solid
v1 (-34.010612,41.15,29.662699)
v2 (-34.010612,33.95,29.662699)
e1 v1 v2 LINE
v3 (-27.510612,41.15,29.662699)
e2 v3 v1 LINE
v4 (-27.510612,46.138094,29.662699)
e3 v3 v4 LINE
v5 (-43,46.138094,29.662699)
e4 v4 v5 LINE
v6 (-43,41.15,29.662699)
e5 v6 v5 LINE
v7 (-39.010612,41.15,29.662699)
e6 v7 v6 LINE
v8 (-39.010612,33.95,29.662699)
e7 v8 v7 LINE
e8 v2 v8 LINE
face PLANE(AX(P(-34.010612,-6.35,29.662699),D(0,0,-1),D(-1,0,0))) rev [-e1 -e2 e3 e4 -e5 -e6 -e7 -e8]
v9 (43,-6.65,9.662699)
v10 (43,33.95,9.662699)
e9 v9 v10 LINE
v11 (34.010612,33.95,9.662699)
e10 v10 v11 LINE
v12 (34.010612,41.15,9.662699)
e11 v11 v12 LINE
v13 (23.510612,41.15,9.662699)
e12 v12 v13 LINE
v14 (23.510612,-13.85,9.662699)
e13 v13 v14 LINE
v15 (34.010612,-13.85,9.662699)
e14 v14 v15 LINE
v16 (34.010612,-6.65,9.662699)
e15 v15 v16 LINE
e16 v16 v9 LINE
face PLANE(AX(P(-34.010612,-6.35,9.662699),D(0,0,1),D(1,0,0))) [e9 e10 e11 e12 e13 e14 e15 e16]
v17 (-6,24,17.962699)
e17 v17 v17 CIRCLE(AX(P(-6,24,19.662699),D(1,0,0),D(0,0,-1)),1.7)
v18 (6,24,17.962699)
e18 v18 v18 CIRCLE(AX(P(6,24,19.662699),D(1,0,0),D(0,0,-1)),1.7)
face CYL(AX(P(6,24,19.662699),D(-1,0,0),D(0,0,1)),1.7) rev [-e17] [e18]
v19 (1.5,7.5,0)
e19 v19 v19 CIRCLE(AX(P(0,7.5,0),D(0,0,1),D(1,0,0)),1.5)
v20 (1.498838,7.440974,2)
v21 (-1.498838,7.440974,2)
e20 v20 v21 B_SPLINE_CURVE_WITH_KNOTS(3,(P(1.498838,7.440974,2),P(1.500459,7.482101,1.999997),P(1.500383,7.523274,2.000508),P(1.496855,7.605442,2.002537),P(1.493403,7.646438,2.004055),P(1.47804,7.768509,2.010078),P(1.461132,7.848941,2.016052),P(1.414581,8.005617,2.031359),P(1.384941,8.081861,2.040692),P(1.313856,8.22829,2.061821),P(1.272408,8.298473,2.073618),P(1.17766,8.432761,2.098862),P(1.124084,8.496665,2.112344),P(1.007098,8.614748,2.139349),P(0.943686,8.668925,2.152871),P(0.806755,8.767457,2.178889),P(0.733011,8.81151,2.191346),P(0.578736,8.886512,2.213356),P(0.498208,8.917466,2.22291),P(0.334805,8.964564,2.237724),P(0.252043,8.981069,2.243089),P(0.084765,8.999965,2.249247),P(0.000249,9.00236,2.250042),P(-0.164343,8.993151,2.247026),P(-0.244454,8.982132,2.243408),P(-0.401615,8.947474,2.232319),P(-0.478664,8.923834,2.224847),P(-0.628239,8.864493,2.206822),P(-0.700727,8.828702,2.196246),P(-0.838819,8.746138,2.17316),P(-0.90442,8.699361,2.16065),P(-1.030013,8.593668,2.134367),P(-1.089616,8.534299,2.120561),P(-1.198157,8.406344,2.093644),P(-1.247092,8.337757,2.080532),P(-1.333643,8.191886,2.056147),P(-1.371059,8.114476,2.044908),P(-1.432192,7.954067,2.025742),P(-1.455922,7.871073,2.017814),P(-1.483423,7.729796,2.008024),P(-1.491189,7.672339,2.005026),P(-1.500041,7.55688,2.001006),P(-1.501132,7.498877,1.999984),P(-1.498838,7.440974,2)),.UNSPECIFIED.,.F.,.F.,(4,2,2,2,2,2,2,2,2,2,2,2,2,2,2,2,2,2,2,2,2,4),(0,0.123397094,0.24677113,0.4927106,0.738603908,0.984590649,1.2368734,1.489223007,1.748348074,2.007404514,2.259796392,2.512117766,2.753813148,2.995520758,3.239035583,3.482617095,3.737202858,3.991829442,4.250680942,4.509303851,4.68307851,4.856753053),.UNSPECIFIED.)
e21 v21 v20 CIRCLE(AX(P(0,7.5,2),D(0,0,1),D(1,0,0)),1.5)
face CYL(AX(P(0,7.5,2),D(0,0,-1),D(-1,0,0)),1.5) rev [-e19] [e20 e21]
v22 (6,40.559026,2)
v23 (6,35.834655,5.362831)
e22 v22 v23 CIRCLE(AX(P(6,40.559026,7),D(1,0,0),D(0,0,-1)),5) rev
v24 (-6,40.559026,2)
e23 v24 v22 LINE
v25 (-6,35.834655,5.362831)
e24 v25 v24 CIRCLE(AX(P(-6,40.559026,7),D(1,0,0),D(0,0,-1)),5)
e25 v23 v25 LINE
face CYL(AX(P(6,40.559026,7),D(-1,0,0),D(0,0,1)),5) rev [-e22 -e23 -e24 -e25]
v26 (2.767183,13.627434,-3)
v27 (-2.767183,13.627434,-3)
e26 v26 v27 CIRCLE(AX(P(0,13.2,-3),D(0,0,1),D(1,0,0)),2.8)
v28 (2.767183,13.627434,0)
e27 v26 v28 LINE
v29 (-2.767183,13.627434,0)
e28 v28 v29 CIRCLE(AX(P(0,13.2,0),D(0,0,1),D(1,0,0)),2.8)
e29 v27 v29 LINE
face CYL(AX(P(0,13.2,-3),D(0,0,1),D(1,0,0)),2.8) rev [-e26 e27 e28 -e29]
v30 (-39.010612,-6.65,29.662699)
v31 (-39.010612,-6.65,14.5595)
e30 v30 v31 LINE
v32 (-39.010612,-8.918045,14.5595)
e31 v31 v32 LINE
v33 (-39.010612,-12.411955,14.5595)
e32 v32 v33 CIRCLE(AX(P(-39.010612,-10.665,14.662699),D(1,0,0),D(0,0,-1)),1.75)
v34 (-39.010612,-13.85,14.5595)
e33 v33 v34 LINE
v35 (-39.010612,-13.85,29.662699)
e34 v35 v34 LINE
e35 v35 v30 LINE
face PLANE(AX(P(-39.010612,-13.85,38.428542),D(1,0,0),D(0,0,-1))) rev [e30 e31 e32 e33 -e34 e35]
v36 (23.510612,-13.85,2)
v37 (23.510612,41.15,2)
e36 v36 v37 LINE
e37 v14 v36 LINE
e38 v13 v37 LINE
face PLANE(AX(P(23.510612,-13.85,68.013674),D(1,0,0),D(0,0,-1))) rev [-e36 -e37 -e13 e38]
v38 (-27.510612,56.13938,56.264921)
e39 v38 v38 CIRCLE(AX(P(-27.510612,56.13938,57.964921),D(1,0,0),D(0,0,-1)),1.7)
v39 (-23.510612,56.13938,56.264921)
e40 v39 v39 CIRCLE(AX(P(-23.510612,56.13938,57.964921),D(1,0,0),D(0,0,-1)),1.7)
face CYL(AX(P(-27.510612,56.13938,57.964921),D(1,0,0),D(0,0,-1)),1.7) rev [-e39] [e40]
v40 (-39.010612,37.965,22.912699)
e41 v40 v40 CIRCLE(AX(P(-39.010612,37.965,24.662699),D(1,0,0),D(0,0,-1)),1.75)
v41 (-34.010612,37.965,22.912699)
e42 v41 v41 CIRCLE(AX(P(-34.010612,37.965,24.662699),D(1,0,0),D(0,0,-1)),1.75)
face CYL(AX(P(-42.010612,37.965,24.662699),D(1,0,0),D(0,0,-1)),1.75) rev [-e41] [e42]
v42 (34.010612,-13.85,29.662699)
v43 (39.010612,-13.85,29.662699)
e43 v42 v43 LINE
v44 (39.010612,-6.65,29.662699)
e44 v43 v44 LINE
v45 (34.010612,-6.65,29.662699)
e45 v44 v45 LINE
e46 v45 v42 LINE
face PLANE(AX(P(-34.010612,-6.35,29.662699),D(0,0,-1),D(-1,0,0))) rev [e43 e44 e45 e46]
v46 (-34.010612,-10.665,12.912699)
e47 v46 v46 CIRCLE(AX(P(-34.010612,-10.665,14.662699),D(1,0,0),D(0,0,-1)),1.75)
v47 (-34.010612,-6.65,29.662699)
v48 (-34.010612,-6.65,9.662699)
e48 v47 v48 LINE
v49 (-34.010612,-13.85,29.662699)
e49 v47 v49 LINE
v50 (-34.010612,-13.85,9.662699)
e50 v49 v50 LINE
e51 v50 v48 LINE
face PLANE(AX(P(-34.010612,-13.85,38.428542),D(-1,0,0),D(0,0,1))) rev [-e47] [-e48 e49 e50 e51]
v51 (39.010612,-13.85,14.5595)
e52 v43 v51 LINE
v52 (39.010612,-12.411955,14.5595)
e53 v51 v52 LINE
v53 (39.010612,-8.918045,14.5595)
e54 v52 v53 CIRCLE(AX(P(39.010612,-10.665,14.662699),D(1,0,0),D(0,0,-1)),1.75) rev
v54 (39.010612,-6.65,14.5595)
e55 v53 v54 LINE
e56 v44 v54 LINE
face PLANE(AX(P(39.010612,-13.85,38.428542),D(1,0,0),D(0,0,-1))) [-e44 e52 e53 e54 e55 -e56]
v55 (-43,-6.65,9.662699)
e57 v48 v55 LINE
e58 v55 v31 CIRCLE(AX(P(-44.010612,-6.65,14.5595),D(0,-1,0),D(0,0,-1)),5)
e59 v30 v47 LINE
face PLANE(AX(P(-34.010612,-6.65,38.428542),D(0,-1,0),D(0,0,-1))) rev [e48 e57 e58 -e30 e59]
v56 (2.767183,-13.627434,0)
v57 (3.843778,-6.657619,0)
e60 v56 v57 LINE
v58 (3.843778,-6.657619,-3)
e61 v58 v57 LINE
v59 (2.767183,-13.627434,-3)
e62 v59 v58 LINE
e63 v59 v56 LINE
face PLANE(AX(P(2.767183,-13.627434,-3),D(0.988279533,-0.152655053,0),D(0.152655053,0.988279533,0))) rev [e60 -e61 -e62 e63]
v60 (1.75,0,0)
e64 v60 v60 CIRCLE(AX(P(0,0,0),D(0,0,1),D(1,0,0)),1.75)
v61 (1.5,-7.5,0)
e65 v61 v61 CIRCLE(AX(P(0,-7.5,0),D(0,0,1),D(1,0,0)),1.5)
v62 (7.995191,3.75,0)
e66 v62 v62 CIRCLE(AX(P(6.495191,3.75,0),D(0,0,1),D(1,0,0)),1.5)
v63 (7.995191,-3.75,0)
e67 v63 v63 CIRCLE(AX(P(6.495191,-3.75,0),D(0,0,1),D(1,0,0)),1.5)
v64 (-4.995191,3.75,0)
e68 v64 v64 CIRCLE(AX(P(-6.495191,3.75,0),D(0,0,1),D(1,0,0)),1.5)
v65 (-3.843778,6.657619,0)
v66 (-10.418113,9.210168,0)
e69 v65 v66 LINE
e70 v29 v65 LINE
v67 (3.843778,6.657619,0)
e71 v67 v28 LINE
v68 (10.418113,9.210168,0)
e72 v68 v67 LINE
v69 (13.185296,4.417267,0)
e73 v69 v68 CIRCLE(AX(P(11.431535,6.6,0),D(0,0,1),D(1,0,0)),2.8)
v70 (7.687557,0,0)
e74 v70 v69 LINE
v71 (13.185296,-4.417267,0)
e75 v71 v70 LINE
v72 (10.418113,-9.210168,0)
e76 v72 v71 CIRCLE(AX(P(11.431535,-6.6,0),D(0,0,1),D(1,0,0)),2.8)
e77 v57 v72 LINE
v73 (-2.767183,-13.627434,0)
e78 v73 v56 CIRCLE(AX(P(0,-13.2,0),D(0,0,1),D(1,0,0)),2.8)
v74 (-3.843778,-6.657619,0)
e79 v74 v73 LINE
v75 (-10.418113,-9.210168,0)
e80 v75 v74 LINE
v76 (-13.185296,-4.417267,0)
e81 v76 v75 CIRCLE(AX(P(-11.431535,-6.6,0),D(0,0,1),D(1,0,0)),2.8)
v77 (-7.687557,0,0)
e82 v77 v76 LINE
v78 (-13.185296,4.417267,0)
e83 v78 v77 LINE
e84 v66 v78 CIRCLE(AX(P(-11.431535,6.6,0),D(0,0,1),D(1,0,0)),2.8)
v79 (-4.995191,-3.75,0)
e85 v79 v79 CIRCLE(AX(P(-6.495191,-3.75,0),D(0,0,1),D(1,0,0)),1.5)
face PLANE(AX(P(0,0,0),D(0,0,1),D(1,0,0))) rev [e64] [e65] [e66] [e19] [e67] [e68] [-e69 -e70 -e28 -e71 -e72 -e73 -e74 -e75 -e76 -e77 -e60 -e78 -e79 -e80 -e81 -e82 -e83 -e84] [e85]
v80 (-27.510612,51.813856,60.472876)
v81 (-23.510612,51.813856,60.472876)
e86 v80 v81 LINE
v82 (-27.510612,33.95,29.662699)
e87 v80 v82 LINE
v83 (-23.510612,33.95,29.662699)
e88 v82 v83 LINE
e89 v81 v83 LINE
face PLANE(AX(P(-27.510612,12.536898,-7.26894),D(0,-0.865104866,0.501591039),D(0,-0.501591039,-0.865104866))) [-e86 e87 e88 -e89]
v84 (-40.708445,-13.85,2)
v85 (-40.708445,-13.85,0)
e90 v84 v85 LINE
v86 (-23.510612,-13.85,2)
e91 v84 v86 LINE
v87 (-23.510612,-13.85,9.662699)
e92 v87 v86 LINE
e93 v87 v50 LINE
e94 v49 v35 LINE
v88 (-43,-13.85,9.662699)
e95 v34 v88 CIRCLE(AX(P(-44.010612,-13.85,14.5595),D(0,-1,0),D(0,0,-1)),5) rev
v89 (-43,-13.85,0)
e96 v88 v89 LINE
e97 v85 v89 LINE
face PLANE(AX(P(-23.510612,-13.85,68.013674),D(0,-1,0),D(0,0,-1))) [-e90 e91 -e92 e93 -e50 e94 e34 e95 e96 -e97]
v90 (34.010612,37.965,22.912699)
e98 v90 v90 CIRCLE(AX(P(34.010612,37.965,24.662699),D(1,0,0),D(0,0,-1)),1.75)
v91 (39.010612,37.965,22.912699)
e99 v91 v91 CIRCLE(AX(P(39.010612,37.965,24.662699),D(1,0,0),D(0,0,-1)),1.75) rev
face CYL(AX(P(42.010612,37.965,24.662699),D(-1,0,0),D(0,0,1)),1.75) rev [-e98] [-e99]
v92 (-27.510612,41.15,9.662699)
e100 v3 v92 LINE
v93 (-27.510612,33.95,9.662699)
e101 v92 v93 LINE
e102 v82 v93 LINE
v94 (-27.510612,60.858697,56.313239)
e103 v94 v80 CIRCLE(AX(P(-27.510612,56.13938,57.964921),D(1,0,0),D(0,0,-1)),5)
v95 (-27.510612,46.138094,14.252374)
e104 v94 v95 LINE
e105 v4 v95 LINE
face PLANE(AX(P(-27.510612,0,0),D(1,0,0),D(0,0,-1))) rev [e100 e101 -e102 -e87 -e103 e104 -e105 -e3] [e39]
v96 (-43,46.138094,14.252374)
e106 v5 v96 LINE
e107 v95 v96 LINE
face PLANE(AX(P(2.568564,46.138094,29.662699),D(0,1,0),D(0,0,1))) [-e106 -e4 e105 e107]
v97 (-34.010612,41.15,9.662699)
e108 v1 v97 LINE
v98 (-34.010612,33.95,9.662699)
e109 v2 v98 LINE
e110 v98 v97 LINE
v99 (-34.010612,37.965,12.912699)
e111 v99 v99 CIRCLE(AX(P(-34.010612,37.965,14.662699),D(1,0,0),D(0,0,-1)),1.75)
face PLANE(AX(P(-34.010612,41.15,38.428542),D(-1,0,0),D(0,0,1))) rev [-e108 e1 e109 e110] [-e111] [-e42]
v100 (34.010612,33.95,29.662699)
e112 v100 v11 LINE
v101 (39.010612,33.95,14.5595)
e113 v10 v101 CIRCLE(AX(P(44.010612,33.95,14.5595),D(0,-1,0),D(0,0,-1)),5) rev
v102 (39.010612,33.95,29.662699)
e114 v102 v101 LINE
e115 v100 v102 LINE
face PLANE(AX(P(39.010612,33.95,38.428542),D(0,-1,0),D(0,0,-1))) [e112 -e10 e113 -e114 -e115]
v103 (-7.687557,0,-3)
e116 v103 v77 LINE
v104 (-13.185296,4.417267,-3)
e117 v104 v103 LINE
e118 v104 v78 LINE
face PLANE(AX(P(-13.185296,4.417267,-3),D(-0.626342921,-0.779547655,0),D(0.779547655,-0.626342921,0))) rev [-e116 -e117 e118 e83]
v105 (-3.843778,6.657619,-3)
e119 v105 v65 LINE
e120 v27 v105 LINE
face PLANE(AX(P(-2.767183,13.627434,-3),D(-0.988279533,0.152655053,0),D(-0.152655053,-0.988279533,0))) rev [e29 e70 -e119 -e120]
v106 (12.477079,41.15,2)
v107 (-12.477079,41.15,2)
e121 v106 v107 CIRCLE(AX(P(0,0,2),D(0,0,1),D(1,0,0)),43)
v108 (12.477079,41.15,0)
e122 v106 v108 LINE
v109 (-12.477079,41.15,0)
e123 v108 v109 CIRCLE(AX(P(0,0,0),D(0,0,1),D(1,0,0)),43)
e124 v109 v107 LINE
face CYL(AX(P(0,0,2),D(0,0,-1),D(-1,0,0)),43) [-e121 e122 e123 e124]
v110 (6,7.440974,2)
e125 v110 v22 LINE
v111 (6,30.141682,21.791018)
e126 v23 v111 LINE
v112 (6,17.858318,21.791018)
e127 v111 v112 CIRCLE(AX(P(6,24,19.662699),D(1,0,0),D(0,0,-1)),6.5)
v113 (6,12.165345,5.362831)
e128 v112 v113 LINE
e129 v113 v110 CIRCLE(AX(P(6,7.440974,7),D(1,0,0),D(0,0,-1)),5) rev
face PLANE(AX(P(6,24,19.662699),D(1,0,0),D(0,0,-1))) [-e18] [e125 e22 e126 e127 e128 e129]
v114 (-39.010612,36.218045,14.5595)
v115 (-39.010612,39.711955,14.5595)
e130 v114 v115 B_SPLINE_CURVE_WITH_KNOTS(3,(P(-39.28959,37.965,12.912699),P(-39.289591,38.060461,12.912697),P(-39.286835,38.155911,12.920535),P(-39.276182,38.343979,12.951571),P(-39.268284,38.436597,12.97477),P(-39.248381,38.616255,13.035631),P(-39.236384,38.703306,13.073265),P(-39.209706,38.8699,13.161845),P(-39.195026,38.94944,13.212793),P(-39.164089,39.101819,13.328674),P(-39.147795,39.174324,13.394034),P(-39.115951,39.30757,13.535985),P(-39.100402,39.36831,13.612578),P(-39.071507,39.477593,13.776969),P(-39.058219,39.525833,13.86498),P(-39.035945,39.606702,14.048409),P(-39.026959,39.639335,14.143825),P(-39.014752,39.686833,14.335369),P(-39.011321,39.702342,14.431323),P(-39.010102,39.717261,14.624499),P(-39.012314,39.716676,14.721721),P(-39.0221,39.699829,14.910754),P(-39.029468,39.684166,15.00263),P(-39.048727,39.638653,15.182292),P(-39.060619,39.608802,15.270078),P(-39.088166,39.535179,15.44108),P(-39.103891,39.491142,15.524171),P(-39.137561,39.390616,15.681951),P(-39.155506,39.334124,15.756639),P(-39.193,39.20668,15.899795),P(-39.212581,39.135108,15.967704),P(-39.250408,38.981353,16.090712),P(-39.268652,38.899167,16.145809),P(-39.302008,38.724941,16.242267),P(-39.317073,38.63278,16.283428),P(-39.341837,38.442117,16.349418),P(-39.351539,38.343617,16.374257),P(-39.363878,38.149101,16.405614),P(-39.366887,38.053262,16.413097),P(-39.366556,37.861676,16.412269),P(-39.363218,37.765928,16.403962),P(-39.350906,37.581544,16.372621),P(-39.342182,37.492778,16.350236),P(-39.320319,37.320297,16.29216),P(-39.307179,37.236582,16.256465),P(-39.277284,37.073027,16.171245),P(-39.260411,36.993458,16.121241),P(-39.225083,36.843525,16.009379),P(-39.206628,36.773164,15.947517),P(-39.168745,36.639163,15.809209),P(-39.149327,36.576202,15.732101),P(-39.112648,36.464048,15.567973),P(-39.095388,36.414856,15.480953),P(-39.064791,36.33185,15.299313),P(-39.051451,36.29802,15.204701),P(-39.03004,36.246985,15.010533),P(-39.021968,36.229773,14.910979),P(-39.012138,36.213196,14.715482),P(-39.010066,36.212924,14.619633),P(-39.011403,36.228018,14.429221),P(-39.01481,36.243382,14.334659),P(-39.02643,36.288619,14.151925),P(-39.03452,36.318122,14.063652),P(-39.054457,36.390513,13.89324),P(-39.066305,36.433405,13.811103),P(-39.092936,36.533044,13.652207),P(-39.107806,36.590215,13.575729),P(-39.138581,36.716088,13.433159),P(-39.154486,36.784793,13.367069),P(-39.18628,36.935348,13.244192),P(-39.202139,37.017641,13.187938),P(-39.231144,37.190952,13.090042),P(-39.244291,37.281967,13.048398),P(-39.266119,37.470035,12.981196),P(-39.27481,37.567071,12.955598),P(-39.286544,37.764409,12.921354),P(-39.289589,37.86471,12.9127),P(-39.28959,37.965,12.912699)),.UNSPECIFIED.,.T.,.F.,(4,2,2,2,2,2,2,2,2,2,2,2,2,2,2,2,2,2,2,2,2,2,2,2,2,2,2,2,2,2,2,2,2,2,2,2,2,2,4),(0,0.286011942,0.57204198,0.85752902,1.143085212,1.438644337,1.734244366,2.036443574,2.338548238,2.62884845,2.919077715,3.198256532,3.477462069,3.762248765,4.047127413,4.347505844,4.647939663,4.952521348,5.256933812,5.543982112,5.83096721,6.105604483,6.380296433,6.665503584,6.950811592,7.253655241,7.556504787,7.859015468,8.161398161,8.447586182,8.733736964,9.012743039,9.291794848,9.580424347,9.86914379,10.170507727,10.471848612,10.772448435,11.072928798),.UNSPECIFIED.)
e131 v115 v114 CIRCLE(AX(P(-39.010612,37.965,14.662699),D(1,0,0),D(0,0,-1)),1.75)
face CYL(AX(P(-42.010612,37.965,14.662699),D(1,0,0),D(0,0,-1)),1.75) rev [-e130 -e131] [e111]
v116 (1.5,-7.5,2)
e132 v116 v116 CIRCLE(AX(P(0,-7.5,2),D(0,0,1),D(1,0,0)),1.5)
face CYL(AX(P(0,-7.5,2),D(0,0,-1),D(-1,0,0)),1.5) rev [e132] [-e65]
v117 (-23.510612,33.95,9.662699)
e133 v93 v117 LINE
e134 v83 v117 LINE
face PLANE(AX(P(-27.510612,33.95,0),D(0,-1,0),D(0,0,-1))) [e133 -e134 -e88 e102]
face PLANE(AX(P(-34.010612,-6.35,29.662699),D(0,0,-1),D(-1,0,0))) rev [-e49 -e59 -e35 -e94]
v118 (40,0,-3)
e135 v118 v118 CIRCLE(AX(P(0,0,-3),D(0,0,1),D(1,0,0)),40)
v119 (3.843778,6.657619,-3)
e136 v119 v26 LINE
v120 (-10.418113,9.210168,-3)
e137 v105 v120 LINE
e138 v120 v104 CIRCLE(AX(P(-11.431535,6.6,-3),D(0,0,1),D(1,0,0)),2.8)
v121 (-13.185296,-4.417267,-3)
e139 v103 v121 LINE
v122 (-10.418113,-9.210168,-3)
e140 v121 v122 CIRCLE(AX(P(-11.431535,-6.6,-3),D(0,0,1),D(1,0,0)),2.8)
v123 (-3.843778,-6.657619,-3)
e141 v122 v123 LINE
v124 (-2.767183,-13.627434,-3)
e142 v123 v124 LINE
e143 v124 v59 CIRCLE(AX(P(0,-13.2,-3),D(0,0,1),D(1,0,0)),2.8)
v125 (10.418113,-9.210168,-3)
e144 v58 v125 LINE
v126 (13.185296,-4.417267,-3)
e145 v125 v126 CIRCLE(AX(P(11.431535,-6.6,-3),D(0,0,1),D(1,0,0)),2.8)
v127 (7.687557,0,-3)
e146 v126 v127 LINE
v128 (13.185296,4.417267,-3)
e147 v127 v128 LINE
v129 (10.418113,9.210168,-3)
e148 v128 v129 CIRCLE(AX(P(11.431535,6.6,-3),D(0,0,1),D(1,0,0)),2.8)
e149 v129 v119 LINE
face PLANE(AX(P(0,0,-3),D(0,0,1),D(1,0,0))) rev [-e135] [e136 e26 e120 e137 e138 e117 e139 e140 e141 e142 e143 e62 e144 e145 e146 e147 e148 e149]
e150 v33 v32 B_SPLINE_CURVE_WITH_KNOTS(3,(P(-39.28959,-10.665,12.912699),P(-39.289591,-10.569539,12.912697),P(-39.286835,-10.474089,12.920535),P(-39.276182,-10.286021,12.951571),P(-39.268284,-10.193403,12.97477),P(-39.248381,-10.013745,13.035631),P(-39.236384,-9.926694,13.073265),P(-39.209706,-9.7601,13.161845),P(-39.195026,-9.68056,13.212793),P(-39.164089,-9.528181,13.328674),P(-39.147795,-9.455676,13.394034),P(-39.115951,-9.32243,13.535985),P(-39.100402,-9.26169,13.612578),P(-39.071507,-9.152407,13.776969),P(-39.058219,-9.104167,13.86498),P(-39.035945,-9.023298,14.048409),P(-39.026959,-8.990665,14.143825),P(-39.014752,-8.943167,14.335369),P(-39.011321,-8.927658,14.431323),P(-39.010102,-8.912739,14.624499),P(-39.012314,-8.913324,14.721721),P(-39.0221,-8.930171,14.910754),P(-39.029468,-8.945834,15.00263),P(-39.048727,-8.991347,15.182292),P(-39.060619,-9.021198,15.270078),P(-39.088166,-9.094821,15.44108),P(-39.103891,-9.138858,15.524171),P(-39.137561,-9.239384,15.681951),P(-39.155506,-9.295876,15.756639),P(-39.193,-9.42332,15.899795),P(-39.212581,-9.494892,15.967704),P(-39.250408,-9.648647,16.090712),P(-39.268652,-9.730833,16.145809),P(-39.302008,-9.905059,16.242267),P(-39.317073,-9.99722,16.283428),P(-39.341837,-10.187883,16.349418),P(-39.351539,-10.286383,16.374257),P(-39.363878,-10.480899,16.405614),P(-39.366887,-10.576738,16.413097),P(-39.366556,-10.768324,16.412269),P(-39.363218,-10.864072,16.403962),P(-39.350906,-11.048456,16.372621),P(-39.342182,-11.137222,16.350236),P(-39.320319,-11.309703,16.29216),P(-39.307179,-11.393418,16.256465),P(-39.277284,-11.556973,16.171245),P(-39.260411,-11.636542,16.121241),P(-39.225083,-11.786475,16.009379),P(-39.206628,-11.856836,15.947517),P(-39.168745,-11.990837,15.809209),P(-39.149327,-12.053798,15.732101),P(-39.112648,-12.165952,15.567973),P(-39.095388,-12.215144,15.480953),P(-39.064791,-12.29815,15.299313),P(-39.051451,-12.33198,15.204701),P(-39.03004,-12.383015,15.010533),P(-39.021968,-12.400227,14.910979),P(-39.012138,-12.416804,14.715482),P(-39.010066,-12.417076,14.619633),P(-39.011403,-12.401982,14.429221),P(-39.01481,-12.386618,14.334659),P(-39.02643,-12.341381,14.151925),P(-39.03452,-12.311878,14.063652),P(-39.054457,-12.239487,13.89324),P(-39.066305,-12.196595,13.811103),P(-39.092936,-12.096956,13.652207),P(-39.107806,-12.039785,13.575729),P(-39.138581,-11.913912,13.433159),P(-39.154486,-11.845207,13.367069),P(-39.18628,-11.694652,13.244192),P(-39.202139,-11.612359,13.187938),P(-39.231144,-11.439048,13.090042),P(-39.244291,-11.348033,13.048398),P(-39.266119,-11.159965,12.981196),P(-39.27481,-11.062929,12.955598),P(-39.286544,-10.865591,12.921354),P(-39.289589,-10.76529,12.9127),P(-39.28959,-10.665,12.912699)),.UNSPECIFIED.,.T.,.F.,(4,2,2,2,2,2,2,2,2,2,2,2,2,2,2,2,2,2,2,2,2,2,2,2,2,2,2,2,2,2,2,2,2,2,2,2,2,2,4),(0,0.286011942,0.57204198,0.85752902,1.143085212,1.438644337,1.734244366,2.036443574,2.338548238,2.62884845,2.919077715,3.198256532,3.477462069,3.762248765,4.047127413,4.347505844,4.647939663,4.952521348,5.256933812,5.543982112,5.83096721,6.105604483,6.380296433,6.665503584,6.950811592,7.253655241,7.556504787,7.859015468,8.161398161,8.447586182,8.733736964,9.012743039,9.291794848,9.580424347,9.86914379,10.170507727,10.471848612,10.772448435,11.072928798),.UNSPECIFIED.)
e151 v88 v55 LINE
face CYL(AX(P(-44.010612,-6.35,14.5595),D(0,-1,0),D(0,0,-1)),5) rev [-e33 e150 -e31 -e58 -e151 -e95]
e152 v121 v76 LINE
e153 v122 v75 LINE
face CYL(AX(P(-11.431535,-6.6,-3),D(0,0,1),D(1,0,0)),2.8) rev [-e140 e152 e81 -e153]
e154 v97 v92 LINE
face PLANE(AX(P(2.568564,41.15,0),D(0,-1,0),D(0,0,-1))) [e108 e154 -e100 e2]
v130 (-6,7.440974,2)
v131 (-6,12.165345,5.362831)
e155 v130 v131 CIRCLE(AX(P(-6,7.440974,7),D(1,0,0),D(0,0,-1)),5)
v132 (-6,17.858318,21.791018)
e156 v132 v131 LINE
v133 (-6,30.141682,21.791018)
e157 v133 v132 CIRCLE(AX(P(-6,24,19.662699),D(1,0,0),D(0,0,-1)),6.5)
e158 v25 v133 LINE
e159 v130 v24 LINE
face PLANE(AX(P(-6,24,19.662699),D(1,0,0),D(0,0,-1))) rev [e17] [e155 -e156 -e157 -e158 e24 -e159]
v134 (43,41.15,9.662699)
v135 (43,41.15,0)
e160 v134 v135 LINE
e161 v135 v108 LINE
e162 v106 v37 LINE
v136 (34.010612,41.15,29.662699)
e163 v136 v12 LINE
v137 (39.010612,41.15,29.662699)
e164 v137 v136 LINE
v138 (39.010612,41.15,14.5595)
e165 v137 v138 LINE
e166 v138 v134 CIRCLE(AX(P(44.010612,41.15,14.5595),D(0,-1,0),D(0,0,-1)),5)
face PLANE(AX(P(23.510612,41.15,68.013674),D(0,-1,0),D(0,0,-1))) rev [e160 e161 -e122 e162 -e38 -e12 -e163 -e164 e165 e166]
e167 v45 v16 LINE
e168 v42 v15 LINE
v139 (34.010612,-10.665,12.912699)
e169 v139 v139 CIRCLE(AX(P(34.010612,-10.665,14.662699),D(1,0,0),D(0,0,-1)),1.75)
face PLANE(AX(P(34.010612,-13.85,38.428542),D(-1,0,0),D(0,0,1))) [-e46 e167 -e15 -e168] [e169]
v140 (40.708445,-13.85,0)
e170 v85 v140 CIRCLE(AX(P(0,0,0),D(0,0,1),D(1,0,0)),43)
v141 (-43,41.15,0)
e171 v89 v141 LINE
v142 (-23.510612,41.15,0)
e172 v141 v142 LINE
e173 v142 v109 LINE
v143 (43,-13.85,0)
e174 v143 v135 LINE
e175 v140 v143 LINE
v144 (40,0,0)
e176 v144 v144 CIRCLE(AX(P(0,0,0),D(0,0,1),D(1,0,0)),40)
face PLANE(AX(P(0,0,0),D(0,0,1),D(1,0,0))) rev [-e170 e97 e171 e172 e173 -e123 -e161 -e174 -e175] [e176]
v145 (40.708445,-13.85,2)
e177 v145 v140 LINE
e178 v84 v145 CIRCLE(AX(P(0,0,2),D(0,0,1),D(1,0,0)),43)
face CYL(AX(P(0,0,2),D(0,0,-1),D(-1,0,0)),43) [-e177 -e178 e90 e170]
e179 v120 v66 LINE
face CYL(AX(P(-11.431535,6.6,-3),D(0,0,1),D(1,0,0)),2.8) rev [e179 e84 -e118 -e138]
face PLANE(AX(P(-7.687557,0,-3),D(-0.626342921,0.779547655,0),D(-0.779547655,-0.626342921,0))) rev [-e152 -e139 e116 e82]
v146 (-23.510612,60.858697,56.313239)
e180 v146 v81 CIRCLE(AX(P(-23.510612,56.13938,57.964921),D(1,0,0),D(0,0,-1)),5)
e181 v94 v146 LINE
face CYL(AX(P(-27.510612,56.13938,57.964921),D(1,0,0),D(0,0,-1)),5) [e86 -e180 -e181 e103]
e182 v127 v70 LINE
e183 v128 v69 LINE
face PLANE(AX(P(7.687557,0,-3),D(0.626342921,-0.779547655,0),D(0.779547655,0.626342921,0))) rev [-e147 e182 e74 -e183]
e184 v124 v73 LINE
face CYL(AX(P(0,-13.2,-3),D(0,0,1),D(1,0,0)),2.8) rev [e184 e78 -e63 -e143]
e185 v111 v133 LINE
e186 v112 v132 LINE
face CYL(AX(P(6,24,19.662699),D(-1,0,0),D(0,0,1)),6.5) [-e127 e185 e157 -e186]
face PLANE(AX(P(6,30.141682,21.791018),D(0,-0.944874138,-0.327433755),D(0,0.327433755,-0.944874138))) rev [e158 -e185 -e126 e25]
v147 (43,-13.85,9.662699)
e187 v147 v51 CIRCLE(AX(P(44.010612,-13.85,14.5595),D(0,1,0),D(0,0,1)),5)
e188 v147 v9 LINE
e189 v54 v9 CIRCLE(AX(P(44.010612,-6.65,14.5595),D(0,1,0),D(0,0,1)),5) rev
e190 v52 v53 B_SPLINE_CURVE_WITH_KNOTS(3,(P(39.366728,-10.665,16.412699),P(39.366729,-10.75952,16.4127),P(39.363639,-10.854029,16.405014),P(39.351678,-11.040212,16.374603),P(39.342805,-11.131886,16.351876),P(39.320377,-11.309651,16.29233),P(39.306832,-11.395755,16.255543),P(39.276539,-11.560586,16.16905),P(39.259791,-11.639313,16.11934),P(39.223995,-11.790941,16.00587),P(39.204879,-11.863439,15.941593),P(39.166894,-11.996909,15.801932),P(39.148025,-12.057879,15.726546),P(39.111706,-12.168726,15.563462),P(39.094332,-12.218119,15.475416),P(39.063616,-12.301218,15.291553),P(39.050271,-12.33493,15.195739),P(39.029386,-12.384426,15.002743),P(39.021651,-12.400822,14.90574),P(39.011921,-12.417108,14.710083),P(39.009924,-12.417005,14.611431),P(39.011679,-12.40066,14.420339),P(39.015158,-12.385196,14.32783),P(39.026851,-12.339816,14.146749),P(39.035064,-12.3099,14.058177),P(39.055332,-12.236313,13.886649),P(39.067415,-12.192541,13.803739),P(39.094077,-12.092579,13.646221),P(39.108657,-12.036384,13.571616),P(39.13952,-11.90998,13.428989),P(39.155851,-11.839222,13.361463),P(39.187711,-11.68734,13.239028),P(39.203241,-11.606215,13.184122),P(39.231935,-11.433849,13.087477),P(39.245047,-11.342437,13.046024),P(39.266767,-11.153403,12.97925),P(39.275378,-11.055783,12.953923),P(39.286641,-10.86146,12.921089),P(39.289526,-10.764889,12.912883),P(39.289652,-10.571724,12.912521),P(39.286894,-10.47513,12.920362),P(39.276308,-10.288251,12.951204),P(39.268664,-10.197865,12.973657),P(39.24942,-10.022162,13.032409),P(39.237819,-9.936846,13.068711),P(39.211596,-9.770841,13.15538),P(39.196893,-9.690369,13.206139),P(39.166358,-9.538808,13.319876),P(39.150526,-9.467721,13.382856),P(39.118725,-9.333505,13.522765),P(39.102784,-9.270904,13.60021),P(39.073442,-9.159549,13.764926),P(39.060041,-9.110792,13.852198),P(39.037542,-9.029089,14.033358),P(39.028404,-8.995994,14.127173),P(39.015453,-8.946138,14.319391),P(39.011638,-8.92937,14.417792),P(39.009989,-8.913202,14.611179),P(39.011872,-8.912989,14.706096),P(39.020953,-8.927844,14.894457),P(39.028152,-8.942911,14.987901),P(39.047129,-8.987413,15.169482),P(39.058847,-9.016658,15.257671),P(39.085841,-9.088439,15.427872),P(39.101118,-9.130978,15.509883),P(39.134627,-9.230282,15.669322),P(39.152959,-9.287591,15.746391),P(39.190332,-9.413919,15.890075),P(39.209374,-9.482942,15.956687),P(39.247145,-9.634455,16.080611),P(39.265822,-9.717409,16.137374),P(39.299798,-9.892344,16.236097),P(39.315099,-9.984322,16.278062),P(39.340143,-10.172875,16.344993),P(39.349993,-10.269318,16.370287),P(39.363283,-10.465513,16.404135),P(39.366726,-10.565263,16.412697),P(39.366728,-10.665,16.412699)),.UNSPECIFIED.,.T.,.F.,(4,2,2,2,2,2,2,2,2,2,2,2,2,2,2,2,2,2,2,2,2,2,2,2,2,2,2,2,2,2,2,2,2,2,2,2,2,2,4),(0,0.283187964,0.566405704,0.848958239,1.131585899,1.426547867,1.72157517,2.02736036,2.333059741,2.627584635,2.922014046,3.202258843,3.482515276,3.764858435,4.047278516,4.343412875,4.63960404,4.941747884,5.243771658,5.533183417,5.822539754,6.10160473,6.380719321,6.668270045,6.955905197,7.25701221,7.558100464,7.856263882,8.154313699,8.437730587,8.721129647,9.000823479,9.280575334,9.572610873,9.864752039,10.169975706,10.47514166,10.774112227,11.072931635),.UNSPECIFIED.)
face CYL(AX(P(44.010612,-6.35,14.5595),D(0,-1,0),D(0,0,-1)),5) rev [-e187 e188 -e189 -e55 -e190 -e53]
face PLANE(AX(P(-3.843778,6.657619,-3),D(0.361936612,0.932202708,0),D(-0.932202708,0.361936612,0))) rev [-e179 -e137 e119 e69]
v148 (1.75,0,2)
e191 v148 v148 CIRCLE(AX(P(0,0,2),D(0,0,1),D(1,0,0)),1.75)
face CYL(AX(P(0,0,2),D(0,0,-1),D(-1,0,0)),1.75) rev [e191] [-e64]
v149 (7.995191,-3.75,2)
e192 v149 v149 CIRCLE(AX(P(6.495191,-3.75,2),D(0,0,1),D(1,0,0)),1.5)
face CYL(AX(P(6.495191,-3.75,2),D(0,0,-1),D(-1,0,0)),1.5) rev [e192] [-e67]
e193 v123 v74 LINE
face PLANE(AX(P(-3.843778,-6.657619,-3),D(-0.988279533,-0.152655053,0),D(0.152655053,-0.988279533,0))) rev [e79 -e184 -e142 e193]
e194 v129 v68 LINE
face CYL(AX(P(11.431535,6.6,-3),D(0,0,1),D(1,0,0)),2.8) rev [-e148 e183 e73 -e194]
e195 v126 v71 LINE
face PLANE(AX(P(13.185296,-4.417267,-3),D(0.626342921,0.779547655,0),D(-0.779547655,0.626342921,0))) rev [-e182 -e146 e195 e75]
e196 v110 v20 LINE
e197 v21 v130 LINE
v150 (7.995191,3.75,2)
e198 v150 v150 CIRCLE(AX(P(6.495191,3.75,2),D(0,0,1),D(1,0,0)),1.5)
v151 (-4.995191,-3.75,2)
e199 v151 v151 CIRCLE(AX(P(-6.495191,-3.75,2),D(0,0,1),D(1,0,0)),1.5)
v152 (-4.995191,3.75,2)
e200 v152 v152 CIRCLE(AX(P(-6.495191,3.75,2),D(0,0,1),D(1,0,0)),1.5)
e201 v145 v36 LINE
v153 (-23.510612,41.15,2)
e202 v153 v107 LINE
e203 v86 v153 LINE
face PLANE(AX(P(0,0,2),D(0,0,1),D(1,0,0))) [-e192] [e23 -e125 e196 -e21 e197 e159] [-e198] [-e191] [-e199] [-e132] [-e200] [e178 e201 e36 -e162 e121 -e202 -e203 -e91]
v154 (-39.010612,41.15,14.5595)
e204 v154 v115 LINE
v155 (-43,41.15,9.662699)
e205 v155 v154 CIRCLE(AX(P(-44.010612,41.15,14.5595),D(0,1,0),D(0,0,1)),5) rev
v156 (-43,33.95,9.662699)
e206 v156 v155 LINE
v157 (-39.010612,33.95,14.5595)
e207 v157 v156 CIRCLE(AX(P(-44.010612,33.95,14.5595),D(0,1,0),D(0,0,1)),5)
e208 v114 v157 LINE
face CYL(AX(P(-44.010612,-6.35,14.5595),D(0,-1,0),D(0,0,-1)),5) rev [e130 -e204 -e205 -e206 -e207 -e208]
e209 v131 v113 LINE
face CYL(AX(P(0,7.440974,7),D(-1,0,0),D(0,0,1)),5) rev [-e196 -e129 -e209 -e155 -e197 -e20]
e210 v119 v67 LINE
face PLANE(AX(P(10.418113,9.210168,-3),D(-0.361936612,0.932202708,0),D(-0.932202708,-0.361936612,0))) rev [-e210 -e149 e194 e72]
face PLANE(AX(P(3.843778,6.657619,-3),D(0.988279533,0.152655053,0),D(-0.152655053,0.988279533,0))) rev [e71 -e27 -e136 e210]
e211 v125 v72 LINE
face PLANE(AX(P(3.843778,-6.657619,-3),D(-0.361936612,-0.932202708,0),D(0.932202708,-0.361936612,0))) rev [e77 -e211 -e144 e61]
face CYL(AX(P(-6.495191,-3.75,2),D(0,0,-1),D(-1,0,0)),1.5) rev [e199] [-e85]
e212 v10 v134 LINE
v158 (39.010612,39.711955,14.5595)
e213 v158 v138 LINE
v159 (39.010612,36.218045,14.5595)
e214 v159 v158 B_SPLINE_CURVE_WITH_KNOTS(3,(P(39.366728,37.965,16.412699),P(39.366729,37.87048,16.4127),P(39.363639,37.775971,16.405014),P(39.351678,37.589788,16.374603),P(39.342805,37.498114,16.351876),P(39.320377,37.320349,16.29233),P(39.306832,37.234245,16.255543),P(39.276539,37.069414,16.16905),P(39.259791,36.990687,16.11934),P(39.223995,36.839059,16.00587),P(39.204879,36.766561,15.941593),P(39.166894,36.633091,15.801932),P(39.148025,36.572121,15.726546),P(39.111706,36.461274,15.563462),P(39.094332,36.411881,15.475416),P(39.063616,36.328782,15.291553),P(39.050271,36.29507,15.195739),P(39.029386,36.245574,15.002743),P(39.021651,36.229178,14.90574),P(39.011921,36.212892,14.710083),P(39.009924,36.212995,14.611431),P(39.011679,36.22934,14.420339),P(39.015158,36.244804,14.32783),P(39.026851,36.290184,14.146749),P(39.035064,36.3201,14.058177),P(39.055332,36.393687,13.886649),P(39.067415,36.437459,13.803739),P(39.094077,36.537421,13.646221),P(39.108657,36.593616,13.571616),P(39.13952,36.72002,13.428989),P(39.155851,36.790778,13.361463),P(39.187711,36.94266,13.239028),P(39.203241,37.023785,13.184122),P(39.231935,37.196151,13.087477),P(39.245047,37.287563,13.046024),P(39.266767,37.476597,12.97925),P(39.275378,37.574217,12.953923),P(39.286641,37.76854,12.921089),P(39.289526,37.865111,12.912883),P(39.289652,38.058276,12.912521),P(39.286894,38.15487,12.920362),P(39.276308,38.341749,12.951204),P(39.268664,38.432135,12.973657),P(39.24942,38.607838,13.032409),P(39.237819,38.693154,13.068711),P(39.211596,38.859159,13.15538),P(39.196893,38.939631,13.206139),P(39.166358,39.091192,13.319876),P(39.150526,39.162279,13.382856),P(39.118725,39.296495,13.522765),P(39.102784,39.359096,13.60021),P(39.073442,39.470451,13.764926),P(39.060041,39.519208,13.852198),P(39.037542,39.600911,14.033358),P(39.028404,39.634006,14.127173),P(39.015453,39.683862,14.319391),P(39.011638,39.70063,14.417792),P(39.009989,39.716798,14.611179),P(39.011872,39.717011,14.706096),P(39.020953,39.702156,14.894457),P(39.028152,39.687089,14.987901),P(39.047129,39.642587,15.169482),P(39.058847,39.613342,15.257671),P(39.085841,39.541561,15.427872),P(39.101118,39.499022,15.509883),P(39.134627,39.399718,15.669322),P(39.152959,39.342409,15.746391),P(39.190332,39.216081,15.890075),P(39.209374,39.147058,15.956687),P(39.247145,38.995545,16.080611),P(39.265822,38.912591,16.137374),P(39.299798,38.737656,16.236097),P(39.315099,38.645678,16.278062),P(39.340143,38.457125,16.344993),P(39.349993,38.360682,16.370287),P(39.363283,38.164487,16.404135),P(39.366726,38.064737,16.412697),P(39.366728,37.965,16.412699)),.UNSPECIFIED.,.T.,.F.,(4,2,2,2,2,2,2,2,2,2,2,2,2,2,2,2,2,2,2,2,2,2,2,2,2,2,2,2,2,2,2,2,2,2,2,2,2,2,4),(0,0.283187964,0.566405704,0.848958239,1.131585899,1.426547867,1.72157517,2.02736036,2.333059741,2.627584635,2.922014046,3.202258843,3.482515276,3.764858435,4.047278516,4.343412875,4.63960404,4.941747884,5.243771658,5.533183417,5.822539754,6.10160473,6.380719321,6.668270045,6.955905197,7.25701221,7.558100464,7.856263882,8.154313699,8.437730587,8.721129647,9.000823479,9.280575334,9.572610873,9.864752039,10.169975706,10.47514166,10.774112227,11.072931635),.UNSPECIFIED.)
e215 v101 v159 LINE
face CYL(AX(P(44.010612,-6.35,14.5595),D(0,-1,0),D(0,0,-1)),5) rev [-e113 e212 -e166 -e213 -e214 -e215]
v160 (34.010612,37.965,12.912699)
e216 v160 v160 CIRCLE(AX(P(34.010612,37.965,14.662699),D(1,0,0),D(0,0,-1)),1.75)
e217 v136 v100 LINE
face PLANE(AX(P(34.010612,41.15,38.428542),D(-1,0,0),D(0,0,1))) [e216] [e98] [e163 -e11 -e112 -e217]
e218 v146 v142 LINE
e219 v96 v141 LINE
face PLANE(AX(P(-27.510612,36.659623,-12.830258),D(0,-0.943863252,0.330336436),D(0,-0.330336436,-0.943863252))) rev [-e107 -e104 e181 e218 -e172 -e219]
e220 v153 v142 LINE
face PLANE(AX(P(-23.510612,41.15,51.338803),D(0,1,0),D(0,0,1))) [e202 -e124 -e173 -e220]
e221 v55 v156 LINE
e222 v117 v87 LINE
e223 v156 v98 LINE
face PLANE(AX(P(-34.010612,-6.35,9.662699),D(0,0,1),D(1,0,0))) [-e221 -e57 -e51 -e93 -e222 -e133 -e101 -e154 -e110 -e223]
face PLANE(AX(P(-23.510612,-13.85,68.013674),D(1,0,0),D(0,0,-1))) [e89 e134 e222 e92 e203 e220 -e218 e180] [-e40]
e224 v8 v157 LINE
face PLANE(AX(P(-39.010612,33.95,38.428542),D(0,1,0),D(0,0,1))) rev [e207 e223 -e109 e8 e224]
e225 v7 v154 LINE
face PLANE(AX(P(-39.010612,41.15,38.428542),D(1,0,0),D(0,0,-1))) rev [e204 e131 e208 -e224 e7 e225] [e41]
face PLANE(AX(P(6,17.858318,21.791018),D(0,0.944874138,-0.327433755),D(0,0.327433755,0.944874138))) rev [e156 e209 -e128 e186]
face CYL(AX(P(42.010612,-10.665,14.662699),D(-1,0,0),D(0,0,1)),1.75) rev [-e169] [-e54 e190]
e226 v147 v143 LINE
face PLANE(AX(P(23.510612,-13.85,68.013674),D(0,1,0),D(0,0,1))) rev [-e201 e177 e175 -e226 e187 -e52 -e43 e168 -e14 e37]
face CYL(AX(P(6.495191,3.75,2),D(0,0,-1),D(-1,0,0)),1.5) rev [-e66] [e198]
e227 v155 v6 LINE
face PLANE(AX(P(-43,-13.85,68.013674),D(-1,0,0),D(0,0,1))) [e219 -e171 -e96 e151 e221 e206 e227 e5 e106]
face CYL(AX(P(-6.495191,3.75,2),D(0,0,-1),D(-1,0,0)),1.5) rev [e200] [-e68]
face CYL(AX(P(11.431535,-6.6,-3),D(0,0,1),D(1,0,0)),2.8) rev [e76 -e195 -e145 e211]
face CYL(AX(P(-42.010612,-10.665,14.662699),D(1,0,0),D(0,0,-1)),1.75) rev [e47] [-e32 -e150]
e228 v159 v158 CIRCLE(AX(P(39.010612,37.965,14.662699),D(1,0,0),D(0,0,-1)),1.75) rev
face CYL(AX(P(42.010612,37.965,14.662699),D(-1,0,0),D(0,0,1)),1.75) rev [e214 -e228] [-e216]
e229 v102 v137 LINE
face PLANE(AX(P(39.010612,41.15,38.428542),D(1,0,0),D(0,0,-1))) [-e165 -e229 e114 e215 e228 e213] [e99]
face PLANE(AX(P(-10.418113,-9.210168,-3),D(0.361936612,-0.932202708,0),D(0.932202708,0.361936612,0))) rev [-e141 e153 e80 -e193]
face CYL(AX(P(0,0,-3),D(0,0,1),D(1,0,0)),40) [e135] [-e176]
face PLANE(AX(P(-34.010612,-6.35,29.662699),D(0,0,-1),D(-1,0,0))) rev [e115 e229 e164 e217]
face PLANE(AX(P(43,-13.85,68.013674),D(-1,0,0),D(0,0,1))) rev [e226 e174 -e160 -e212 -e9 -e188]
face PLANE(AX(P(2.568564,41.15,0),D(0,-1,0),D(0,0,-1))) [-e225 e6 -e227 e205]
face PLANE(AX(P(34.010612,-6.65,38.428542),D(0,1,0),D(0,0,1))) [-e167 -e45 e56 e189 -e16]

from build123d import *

# Parameters (mm, degrees)
SKETCH_2_R             = 40
EXTRUDE_1_DEPTH        = 3
SKETCH_3_R             = 43
SKETCH_3_R_2           = 1.5
SKETCH_3_R_3           = 1.75
EXTRUDE_2_DEPTH        = 2
SKETCH_4_R             = 1.7
EXTRUDE_3_DEPTH        = 6
SKETCH_6_W             = 19.489388493
SKETCH_6_H             = 55
EXTRUDE_4_DEPTH        = 9.662698808
SKETCH_7_W             = 5
SKETCH_7_H             = 7.2
EXTRUDE_5_DEPTH        = 20
FILLET_1_R             = 5
SKETCH_8_R             = 1.75
CUT_EXTRUDE_1_DEPTH    = 8
FILLET_1_OF_MIRROR_1_R = 5
FILLET_2_R             = 5
SKETCH_10_R            = 5
SKETCH_10_R_2          = 1.7
EXTRUDE_6_DEPTH        = 4
EXTRUDE_7_DEPTH        = 15.489388493
SKETCH_13_W            = 48.978361992
SKETCH_13_H            = 5.952940671
EXTRUDE_8_DEPTH        = 2


with BuildPart() as part:
    # 草图2 → 凸台-拉伸1 (new body)
    with BuildSketch(Plane.XY):
        Circle(SKETCH_2_R)
        with BuildLine():
            Line((-3.843778342, 6.657619381), (-10.418112816, 9.210167583))
            ThreePointArc((-10.418112816, 9.210167583), (-13.856406461, 8), (-13.185295508, 4.417266567))
            Line((-13.185295508, 4.417266567), (-7.687556684, 0))
            Line((-7.687556684, 0), (-13.185295508, -4.417266567))
            ThreePointArc((-13.185295508, -4.417266567), (-13.856406461, -8), (-10.418112816, -9.210167583))
            Line((-10.418112816, -9.210167583), (-3.843778342, -6.657619381))
            Line((-3.843778342, -6.657619381), (-2.767182691, -13.62743415))
            ThreePointArc((-2.767182691, -13.62743415), (0, -16), (2.767182691, -13.62743415))
            Line((2.767182691, -13.62743415), (3.843778342, -6.657619381))
            Line((3.843778342, -6.657619381), (10.418112816, -9.210167583))
            ThreePointArc((10.418112816, -9.210167583), (13.856406461, -8), (13.185295508, -4.417266567))
            Line((13.185295508, -4.417266567), (7.687556684, 0))
            Line((7.687556684, 0), (13.185295508, 4.417266567))
            ThreePointArc((13.185295508, 4.417266567), (13.856406461, 8), (10.418112816, 9.210167583))
            Line((10.418112816, 9.210167583), (3.843778342, 6.657619381))
            Line((3.843778342, 6.657619381), (2.767182691, 13.62743415))
            ThreePointArc((2.767182691, 13.62743415), (0, 16), (-2.767182691, 13.62743415))
            Line((-2.767182691, 13.62743415), (-3.843778342, 6.657619381))
        make_face(mode=Mode.SUBTRACT)
    extrude(amount=-EXTRUDE_1_DEPTH)

    # 草图3 → 凸台-拉伸2 (add)
    with BuildSketch(Plane.XY):
        Circle(SKETCH_3_R)
        with Locations((0, -7.5)):
            Circle(SKETCH_3_R_2, mode=Mode.SUBTRACT)
        with Locations((-6.495190528, -3.75)):
            Circle(SKETCH_3_R_2, mode=Mode.SUBTRACT)
        with Locations((-6.495190528, 3.75)):
            Circle(SKETCH_3_R_2, mode=Mode.SUBTRACT)
        with Locations((0, 7.5)):
            Circle(SKETCH_3_R_2, mode=Mode.SUBTRACT)
        with Locations((6.495190528, 3.75)):
            Circle(SKETCH_3_R_2, mode=Mode.SUBTRACT)
        with Locations((6.495190528, -3.75)):
            Circle(SKETCH_3_R_2, mode=Mode.SUBTRACT)
        Circle(SKETCH_3_R_3, mode=Mode.SUBTRACT)
    extrude(amount=EXTRUDE_2_DEPTH)

    # 草图4 → 凸台-拉伸3 (add, symmetric)
    with BuildSketch(Plane(origin=(0, 0, 0), x_dir=(0, 0, -1), z_dir=(1, 0, 0))):
        with BuildLine():
            Line((-21.791018214, 17.858318105), (-2, 11))
            Line((-2, 11), (-2, 37))
            Line((-2, 37), (-21.791018214, 30.141681895))
            ThreePointArc((-21.791018214, 30.141681895), (-26.162698808, 24), (-21.791018214, 17.858318105))
        make_face()
        with Locations((-19.662698808, 24)):
            Circle(SKETCH_4_R, mode=Mode.SUBTRACT)
    extrude(amount=EXTRUDE_3_DEPTH, both=True)

    # 草图6 → 凸台-拉伸4 (add)
    with BuildSketch(Plane(origin=(0, 0, 0), x_dir=(-1, 0, 0), z_dir=(0, 0, -1))):
        with Locations((33.255305753, 13.65)):
            Rectangle(SKETCH_6_W, SKETCH_6_H)
    extrude_4 = extrude(amount=-EXTRUDE_4_DEPTH)

    # 草图7 → 凸台-拉伸5 (add)
    with BuildSketch(Plane.XY.offset(9.662698808)):
        with Locations((-36.510611507, 37.55)):
            Rectangle(SKETCH_7_W, SKETCH_7_H)
        with Locations((-36.510611507, -10.25)):
            Rectangle(SKETCH_7_W, SKETCH_7_H)
    extrude_5 = extrude(amount=EXTRUDE_5_DEPTH)

    # 圆角1
    # the kernel refuses this fillet: 5 mm, written as the material it adds along each edge
    with BuildSketch(Plane(origin=(-39.010611507, -13.85, 9.662698808), x_dir=(-1.0, 0, 9.057736173164017e-11), z_dir=(0, 1, 0)), Plane(origin=(-39.010611507, 33.95, 9.662698808), x_dir=(-1.0, 0, 9.057736173164017e-11), z_dir=(0, 1, 0))) as fillet_1_piece_1:
        with BuildLine():
            CenterArc((5, 4.896801444), FILLET_1_R, 179.999999995, 78.338907052)
            Line((0, 4.896801444), (-0.1, 4.896801444))
            Line((-0.1, 4.896801444), (-0.1, 0))
            Line((-0.1, 0), (0, -0.1))
            ThreePointArc((0, -0.1), (1.994694247, -0.1), (3.969176263, -0.097936029))
            Line((3.969176263, -0.097936029), (3.989388493, 0))
        make_face()
    extrude(amount=7.2)

    # 草图8 → 切除-拉伸1 (cut)
    with BuildSketch(Plane(origin=(-34.010611507, 0, 0), x_dir=(0, 0, -1), z_dir=(1, 0, 0))):
        with Locations((-14.662698808, 37.965)):
            Circle(SKETCH_8_R)
        with Locations((-24.662698808, 37.965)):
            Circle(SKETCH_8_R)
        with Locations((-14.662698808, -10.665)):
            Circle(SKETCH_8_R)
        with Locations((24.662698808, -10.665)):
            Circle(SKETCH_8_R)
    cut_extrude_1 = extrude(amount=-CUT_EXTRUDE_1_DEPTH, mode=Mode.SUBTRACT)

    # 镜向1: 凸台-拉伸4, 凸台-拉伸5, 切除-拉伸1 across plane
    add(extrude_4.mirror(Plane(origin=(0, 0, 0), x_dir=(0, 0, 1), z_dir=(1, 0, 0))))
    add(extrude_5.mirror(Plane(origin=(0, 0, 0), x_dir=(0, 0, 1), z_dir=(1, 0, 0))))
    add(cut_extrude_1.mirror(Plane(origin=(0, 0, 0), x_dir=(0, 0, 1), z_dir=(1, 0, 0))), mode=Mode.SUBTRACT)

    # 圆角1 of 镜向1
    # the kernel refuses this fillet: 5 mm, written as the material it adds along each edge
    with BuildSketch(Plane(origin=(39.010611507, -13.85, 9.662698808), x_dir=(1.0, 0, 9.057736173164017e-11), z_dir=(0, 1, 0))) as fillet_1_of_mirror_1_piece_1_section:
        with BuildLine():
            CenterArc((5, -4.896801444), FILLET_1_OF_MIRROR_1_R, 101.661092954, 78.338907052)
            Line((0, -4.896801444), (-0.1, -4.896801444))
            Line((-0.1, -4.896801444), (-0.1, 0))
            Line((-0.1, 0), (0, 0.1))
            ThreePointArc((0, 0.1), (1.994694247, 0.1), (3.969176263, 0.097936029))
            Line((3.969176263, 0.097936029), (3.989388493, 0))
        make_face()
    fillet_1_of_mirror_1_piece_1 = extrude(amount=7.2, mode=Mode.PRIVATE)
    fillet_1_of_mirror_1_piece_1 = fillet_1_of_mirror_1_piece_1 - Plane(origin=(40.024571276, -10.665, 14.662698808), x_dir=(0, 0, -1), z_dir=(-1, 0, 0)) * Cylinder(1.75, 34, mode=Mode.PRIVATE)
    add(fillet_1_of_mirror_1_piece_1)
    with BuildSketch(Plane(origin=(39.010611507, 33.95, 9.662698808), x_dir=(1.0, 0, 9.057736173164017e-11), z_dir=(0, 1, 0))) as fillet_1_of_mirror_1_piece_2_section:
        with BuildLine():
            CenterArc((5, -4.896801444), FILLET_1_OF_MIRROR_1_R, 101.661092954, 78.338907052)
            Line((0, -4.896801444), (-0.1, -4.896801444))
            Line((-0.1, -4.896801444), (-0.1, 0))
            Line((-0.1, 0), (0, 0.1))
            ThreePointArc((0, 0.1), (1.994694247, 0.1), (3.969176263, 0.097936029))
            Line((3.969176263, 0.097936029), (3.989388493, 0))
        make_face()
    fillet_1_of_mirror_1_piece_2 = extrude(amount=7.2, mode=Mode.PRIVATE)
    fillet_1_of_mirror_1_piece_2 = fillet_1_of_mirror_1_piece_2 - Plane(origin=(40.024571271, 37.965, 14.662698808), x_dir=(0, 0, -1), z_dir=(-1, 0, 0)) * Cylinder(1.75, 34, mode=Mode.PRIVATE)
    add(fillet_1_of_mirror_1_piece_2)

    # 圆角2
    # the kernel refuses this fillet: 5 mm, written as the material it adds along each edge
    with BuildSketch(Plane(origin=(-6, 11, 2), x_dir=(0, -1, 0), z_dir=(1, 0, 0))) as fillet_2_piece_1_section:
        with BuildLine():
            CenterArc((FILLET_2_R * 0.711805115944, -FILLET_2_R), FILLET_2_R, 90, 70.886911337)
            Line((-FILLET_2_R * 0.233069021814, -FILLET_2_R * 0.672566245179), (0, 0))
            Line((0, 0), (FILLET_2_R * 0.711805115944, 0))
        make_face()
    fillet_2_piece_1 = extrude(amount=12, mode=Mode.PRIVATE)
    fillet_2_piece_1 = fillet_2_piece_1 - Plane(origin=(0, 7.5, 2.750651106), x_dir=(1, 0, 0), z_dir=(0, 0, -1)) * Cylinder(1.5, 39, mode=Mode.PRIVATE)
    add(fillet_2_piece_1)
    with BuildSketch(Plane(origin=(-6, 37, 2), x_dir=(0, 1, 0), z_dir=(1, 0, 0))) as fillet_2_piece_2:
        with BuildLine():
            CenterArc((FILLET_2_R * 0.711805115944, FILLET_2_R), FILLET_2_R, 199.113088663, 70.886911337)
            Line((-FILLET_2_R * 0.233069021814, FILLET_2_R * 0.672566245179), (0, 0))
            Line((0, 0), (FILLET_2_R * 0.711805115944, 0))
        make_face()
    extrude(amount=12)

    # 草图10 → 凸台-拉伸6 (add)
    # profile 1 of 2: a face of its own
    with BuildSketch(Plane(origin=(-23.510611507, 0, 0), x_dir=(0, 0, -1), z_dir=(1, 0, 0))):
        with BuildLine():
            Line((0, 41.15), (-56.313238783, 60.858696746))
            ThreePointArc((-56.313238783, 60.858696746), (-53.887028683, 59.032613027), (-52.964920964, 56.139380484))
            ThreePointArc((-52.964920964, 56.139380484), (-55.468901732, 51.806957606), (-60.472876161, 51.813856154))
            Line((-60.472876161, 51.813856154), (-29.662698808, 33.95))
            Line((-29.662698808, 33.95), (-9.662698808, 33.95))
            Line((-9.662698808, 33.95), (-9.662698808, 41.15))
            Line((-9.662698808, 41.15), (0, 41.15))
        make_face()
    # profile 2 of 2: a face of its own
    with BuildSketch(Plane(origin=(-23.510611507, 0, 0), x_dir=(0, 0, -1), z_dir=(1, 0, 0))):
        with Locations((-57.964920964, 56.139380484)):
            Circle(SKETCH_10_R)
        with Locations((-57.964920964, 56.139380484)):
            Circle(SKETCH_10_R_2, mode=Mode.SUBTRACT)
    extrude(amount=-EXTRUDE_6_DEPTH)

    # 草图11 → 凸台-拉伸7 (add)
    with BuildSketch(Plane.ZY.offset(43)):
        Polygon((0, 41.15), (29.662698808, 41.15), (29.662698808, 46.138093671), (14.25237364, 46.138093671), align=None)
    extrude(amount=-EXTRUDE_7_DEPTH)

    # 草图13 → 凸台-拉伸8 (add)
    with BuildSketch(Plane(origin=(0, 0, 0), x_dir=(-1, 0, 0), z_dir=(0, 0, -1))):
        with Locations((-0.978569489, 38.173529665)):
            Rectangle(SKETCH_13_W, SKETCH_13_H)
    extrude(amount=-EXTRUDE_8_DEPTH)


solid = part.part
